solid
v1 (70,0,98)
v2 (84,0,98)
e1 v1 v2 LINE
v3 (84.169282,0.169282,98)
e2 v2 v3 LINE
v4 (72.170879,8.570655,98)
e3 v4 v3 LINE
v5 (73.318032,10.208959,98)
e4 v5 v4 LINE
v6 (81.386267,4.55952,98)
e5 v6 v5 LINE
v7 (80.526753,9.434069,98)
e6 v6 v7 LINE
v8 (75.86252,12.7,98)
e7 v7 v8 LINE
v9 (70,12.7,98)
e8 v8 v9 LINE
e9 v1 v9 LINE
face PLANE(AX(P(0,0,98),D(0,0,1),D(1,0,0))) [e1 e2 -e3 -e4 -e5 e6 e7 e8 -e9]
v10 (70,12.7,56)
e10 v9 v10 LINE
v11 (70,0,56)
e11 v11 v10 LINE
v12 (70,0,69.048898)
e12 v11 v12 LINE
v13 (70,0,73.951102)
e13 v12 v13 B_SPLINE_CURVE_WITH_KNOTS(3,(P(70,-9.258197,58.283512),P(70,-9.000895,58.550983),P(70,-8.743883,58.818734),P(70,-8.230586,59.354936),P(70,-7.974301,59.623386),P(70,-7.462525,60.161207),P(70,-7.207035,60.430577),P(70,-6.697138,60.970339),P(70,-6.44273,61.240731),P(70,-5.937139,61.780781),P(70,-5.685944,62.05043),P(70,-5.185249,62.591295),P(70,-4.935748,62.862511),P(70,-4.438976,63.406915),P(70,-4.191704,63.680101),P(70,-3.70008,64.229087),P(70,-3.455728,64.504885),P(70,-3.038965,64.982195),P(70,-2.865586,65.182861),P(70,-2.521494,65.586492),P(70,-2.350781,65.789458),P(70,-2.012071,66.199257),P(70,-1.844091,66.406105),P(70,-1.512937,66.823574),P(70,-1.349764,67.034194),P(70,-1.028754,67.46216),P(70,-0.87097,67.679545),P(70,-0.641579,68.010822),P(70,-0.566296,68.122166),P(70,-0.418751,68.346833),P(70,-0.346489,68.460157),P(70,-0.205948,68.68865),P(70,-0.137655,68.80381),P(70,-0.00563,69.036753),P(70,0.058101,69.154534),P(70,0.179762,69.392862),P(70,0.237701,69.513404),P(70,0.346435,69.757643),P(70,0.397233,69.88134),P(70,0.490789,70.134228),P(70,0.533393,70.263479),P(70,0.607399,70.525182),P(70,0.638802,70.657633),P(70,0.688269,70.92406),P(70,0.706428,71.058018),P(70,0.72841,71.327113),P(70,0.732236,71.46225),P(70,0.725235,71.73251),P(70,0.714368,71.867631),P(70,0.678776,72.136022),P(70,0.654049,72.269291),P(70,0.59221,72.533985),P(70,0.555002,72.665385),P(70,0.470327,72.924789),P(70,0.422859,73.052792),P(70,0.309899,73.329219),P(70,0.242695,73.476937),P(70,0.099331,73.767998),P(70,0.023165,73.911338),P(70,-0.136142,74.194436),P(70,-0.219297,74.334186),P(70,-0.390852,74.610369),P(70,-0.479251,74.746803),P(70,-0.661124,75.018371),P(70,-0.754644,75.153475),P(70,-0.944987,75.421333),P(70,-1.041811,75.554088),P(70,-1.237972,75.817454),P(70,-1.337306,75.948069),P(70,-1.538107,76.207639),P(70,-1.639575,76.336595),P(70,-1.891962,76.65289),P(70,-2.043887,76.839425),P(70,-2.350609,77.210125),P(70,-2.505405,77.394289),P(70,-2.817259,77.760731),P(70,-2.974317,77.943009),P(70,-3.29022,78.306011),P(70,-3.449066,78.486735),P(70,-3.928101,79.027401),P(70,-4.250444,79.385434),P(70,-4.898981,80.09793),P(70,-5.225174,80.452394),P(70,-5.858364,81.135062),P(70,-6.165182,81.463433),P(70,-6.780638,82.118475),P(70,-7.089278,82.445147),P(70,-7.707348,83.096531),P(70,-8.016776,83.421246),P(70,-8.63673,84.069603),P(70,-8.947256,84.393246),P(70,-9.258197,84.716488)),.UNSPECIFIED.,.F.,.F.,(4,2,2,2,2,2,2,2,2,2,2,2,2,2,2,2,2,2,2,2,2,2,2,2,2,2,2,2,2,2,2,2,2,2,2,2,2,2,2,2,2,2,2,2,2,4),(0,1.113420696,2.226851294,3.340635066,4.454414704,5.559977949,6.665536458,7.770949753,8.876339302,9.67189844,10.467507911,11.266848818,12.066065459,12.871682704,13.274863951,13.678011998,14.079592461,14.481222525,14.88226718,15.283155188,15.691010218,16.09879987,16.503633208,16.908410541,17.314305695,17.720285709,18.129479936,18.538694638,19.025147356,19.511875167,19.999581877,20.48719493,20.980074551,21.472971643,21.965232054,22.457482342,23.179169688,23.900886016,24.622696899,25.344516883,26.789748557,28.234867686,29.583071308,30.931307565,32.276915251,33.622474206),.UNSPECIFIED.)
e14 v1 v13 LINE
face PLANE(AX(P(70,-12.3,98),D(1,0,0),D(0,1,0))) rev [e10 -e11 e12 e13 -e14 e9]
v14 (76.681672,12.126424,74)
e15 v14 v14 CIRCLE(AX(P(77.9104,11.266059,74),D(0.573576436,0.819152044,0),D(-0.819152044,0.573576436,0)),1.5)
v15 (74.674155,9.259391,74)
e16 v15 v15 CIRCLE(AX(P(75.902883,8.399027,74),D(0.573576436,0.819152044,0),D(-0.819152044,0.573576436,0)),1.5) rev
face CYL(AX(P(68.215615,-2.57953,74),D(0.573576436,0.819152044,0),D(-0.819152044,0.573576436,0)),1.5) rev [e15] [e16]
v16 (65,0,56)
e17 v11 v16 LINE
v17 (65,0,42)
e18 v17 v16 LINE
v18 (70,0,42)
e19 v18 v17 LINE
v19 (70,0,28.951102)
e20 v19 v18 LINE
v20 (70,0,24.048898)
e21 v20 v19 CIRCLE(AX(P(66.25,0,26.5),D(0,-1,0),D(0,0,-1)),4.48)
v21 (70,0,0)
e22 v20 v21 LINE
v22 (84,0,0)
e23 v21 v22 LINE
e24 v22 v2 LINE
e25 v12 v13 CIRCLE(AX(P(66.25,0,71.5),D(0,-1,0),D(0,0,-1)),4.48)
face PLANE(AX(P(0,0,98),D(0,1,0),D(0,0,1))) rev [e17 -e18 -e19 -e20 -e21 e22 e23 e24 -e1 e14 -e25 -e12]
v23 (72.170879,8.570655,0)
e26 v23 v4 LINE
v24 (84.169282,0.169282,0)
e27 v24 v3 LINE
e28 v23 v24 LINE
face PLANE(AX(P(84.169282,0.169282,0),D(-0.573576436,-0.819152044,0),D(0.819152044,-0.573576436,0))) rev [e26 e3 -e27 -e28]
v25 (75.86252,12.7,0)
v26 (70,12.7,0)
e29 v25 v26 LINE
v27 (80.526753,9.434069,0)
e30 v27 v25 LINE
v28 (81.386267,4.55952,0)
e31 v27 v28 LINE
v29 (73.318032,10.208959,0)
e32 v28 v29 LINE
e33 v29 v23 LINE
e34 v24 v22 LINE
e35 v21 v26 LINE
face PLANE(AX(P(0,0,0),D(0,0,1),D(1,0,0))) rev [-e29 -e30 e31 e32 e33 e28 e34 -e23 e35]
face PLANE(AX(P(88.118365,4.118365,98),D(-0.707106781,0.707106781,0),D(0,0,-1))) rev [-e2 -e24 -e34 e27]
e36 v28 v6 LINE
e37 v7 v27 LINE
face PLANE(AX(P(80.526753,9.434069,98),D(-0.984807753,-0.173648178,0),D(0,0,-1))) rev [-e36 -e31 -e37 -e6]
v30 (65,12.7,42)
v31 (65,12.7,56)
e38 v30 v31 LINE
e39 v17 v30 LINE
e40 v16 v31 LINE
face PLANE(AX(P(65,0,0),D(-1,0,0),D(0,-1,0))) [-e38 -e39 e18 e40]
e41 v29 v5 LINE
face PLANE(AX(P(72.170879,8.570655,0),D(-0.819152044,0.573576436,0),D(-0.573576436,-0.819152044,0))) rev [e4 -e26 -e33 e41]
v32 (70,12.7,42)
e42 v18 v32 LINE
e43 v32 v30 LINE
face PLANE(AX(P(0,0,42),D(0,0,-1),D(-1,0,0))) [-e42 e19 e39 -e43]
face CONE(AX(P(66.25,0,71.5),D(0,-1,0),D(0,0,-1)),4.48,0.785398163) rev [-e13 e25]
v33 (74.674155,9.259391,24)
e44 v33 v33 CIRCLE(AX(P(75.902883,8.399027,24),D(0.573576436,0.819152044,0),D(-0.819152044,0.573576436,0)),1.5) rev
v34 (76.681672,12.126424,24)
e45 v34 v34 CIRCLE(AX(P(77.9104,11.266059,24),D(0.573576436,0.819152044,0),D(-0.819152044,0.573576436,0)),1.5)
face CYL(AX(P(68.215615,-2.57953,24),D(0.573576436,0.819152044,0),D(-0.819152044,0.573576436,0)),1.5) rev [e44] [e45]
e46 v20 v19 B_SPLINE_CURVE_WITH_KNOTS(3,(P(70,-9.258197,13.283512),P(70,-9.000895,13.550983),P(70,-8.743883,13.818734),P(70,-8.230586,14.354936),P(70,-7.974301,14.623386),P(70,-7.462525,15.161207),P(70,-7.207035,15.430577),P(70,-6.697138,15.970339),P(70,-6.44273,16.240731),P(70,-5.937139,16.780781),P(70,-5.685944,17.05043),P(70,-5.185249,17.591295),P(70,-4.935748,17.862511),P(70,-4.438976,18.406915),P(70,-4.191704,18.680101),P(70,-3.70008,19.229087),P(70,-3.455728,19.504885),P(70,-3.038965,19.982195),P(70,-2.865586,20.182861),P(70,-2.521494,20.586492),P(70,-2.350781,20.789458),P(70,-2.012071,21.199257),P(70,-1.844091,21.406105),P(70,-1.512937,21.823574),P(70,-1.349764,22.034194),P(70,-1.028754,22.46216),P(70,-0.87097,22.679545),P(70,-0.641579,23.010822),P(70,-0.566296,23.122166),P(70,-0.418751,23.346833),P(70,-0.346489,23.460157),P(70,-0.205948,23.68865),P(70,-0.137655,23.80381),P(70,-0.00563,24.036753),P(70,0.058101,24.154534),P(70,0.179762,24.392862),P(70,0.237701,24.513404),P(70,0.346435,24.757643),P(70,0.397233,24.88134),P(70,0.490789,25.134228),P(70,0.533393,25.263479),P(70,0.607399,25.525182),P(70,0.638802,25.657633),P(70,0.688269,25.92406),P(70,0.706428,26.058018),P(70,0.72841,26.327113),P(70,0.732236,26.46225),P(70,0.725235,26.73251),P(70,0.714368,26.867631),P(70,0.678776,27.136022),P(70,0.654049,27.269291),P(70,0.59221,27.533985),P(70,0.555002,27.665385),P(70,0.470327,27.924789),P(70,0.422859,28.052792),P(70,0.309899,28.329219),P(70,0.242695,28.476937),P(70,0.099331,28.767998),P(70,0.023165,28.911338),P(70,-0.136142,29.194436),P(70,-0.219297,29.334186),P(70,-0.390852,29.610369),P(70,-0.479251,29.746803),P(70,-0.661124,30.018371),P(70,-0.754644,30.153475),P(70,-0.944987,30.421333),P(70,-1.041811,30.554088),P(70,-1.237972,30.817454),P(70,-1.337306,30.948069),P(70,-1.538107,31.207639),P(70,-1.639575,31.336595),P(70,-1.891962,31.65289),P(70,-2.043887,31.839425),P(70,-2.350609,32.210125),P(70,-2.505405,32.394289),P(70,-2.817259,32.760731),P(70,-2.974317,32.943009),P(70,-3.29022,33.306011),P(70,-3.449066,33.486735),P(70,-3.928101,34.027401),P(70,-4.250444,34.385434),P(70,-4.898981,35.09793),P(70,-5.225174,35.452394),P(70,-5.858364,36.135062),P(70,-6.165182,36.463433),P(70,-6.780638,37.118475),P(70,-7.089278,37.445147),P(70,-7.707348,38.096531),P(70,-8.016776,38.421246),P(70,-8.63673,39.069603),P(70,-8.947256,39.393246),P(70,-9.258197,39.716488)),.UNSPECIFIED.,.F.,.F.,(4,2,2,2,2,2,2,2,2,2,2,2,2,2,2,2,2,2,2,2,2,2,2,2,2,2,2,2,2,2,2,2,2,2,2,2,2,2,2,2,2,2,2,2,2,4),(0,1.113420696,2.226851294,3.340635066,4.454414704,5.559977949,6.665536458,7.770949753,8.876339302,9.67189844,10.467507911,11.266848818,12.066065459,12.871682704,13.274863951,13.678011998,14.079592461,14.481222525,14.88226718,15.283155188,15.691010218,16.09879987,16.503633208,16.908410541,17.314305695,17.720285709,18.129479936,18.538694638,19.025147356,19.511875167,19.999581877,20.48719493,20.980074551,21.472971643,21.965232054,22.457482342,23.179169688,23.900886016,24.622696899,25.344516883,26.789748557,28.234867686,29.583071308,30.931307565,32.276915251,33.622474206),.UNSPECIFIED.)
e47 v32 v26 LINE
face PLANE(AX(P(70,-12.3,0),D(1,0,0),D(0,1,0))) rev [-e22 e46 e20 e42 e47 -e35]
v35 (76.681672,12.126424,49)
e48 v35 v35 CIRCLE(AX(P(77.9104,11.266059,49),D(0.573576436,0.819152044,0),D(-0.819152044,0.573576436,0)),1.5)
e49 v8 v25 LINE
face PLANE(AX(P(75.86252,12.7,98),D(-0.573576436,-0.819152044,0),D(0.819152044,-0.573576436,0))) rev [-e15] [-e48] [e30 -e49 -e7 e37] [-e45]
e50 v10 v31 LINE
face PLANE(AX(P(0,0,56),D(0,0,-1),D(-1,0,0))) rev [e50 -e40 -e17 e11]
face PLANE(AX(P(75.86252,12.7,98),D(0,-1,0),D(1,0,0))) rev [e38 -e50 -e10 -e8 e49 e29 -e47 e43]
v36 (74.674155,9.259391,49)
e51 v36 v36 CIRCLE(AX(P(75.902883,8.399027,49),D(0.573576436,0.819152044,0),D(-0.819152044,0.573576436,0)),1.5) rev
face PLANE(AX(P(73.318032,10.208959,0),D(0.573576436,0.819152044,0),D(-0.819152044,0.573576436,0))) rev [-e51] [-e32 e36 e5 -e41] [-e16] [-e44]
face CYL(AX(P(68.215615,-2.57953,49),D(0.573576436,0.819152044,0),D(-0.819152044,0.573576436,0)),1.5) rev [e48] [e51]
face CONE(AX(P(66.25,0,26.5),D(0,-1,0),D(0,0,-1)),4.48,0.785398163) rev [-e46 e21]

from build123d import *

# Parameters (mm, degrees)
RESSALTO_EXTRUS_O1_DEPTH                            = 98
ESBO_O4_W                                           = 33
ESBO_O4_H                                           = 22
CORTE_EXTRUS_O3_DEPTH                               = 25
ESBO_O10_W                                          = 12
ESBO_O10_H                                          = 4
CORTE_EXTRUS_O8_DEPTH                               = 122.545423608
ESBO_O11_R                                          = 1.6
CORTE_EXTRUS_O9_DEPTH                               = 20
ESBO_O12_W                                          = 22
ESBO_O12_H                                          = 40
CORTE_EXTRUS_O10_DEPTH                              = 10
FILETE1_R                                           = 2.5
ESCAREADO_PARA_PARAFUSO_ALLEN_SEXTAVADO_D           = 4.3
ESCAREADO_PARA_PARAFUSO_ALLEN_SEXTAVADO_CSINK_D     = 8.96
ESCAREADO_PARA_PARAFUSO_ALLEN_SEXTAVADO_CSINK_ANGLE = 90
ESBO_O15_W                                          = 4
ESBO_O15_H                                          = 22
CORTE_EXTRUS_O11_DEPTH                              = 137.386546257
ESBO_O16_W                                          = 59.5
ESBO_O16_H                                          = 54
ESBO_O16_R                                          = 2.15
CORTE_EXTRUS_O12_DEPTH                              = 137.386546257
CHANFRO1_SIZE                                       = 10
CHANFRO1_SIZE2                                      = 7.180150431
CORTE_EXTRUS_O14_DEPTH                              = 102.622518505
CORTE_EXTRUS_O14_DEPTH_BACK                         = 102.622518505
CHANFRO2_SIZE                                       = 8
CHANFRO2_SIZE_2                                     = 9.267647445
CORTE_EXTRUS_O15_REACH                              = 121.956
ESBO_O19_R                                          = 1.5


with BuildPart() as part:
    # Esboço1 → Ressalto-extrusão1 (new body)
    with BuildSketch(Plane.XY):
        Polygon((0, 0), (94, 0), (75.862520314, 12.7), (0, 12.7), align=None)
    extrude(amount=RESSALTO_EXTRUS_O1_DEPTH)

    # Esboço4 → Corte-extrusão3 (cut)
    with BuildSketch(Plane(origin=(0, 12.7, 0), x_dir=(1, 0, 0), z_dir=(0, 1, 0))):
        with Locations((16.5, -87)):
            Rectangle(ESBO_O4_W, ESBO_O4_H)
        with Locations((16.5, -11)):
            Rectangle(ESBO_O4_W, ESBO_O4_H)
        with Locations((53.5, -87)):
            Rectangle(ESBO_O4_W, ESBO_O4_H)
        with Locations((53.5, -11)):
            Rectangle(ESBO_O4_W, ESBO_O4_H)
    extrude(amount=-CORTE_EXTRUS_O3_DEPTH, mode=Mode.SUBTRACT)

    # Esboço10 → Corte-extrusão8 (cut, through all)
    with BuildSketch(Plane.XY.offset(76)):
        with Locations((16.5, 10.7)):
            Rectangle(ESBO_O10_W, ESBO_O10_H)
        with Locations((53.5, 10.7)):
            Rectangle(ESBO_O10_W, ESBO_O10_H)
    extrude(amount=-CORTE_EXTRUS_O8_DEPTH, mode=Mode.SUBTRACT)

    # Esboço11 → Corte-extrusão9 (cut)
    with BuildSketch(Plane(origin=(0, 12.7, 0), x_dir=(1, 0, 0), z_dir=(0, 1, 0))):
        with Locations(Location((29.25, -26.5, 0), (0, 0, 180))):
            Circle(ESBO_O11_R)
        with Locations(Location((29.25, -71.5, 0), (0, 0, 180))):
            Circle(ESBO_O11_R)
        with Locations(Location((3.75, -71.5, 0), (0, 0, 180))):
            Circle(ESBO_O11_R)
        with Locations(Location((3.75, -26.5, 0), (0, 0, 180))):
            Circle(ESBO_O11_R)
        with Locations(Location((40.75, -26.5, 0), (0, 0, 180))):
            Circle(ESBO_O11_R)
        with Locations(Location((66.25, -26.5, 0), (0, 0, 180))):
            Circle(ESBO_O11_R)
        with Locations(Location((66.25, -71.5, 0), (0, 0, 180))):
            Circle(ESBO_O11_R)
        with Locations(Location((40.75, -71.5, 0), (0, 0, 180))):
            Circle(ESBO_O11_R)
    extrude(amount=-CORTE_EXTRUS_O9_DEPTH, mode=Mode.SUBTRACT)

    # Esboço12 → Corte-extrusão10 (cut)
    with BuildSketch(Plane(origin=(0, 12.7, 0), x_dir=(1, 0, 0), z_dir=(0, 1, 0))):
        with Locations((35, -49)):
            Rectangle(ESBO_O12_W, ESBO_O12_H)
    extrude(amount=-CORTE_EXTRUS_O10_DEPTH, mode=Mode.SUBTRACT)

    # Filete1
    filete1_edges = [part.edges().sort_by_distance(p)[0] for p in [
        (46, 7.7, 29),
        (46, 7.7, 69),
        (24, 7.7, 69),
        (24, 7.7, 29),
    ]]
    fillet(filete1_edges, radius=FILETE1_R)

    # Escareado para parafuso Allen sextavado escareado de M41 (through all)
    with Locations(Plane(origin=(0, 0, 0), x_dir=(-1, 0, 0), z_dir=(0, -1, 0))):
        with Locations((-66.25, -71.5), (-66.25, -26.5), (-40.75, -26.5), (-29.25, -26.5), (-29.25, -71.5), (-40.75, -71.5), (-3.75, -71.5), (-3.75, -26.5)):
            CounterSinkHole(ESCAREADO_PARA_PARAFUSO_ALLEN_SEXTAVADO_D / 2, ESCAREADO_PARA_PARAFUSO_ALLEN_SEXTAVADO_CSINK_D / 2, counter_sink_angle=ESCAREADO_PARA_PARAFUSO_ALLEN_SEXTAVADO_CSINK_ANGLE)

    # Esboço15 → Corte-extrusão11 (cut, through all)
    with BuildSketch(Plane(origin=(0, 12.7, 0), x_dir=(1, 0, 0), z_dir=(0, 1, 0))):
        with Locations((35, -11)):
            Rectangle(ESBO_O15_W, ESBO_O15_H)
        with Locations((35, -87)):
            Rectangle(ESBO_O15_W, ESBO_O15_H)
    extrude(amount=-CORTE_EXTRUS_O11_DEPTH, mode=Mode.SUBTRACT)

    # Esboço16 → Corte-extrusão12 (cut, through all)
    # profile 1 of 2: a face of its own
    with BuildSketch(Plane(origin=(0, 12.7, 0), x_dir=(1, 0, 0), z_dir=(0, 1, 0))):
        with Locations((29.75, -49)):
            Rectangle(ESBO_O16_W, ESBO_O16_H)
    # profile 2 of 2: a face of its own
    with BuildSketch(Plane(origin=(0, 12.7, 0), x_dir=(1, 0, 0), z_dir=(0, 1, 0))):
        Polygon((70, -42), (70, -22), (59.5, -22), (59.5, -76), (70, -76), (70, -56), (65, -56), (65, -42), align=None)
        with Locations((66.25, -71.5)):
            Circle(ESBO_O16_R, mode=Mode.SUBTRACT)
        with Locations((66.25, -26.5)):
            Circle(ESBO_O16_R, mode=Mode.SUBTRACT)
    extrude(amount=-CORTE_EXTRUS_O12_DEPTH, mode=Mode.SUBTRACT)

    # Chanfro1
    chanfro1_edges = [part.edges().sort_by_distance(p)[0] for p in [
        (94, 0, 49),
    ]]
    chanfro1_side = [part.faces().sort_by_distance(p)[0] for p in [
        (81.603595513, 0, 49),
    ]]
    chamfer(chanfro1_edges, length=CHANFRO1_SIZE, length2=CHANFRO1_SIZE2, reference=chanfro1_side[0])

    # Esboço18 → Corte-extrusão14 (cut, two sides: drawn at the far end of the back side and taken through both)
    with BuildSketch(Plane.XY.offset(49).offset(-CORTE_EXTRUS_O14_DEPTH_BACK)):
        Polygon((73.318031781, 10.208958991), (85.605312446, 1.605312446), (84.16928236, 0.16928236), (72.170878909, 8.570654902), align=None)
    extrude(amount=CORTE_EXTRUS_O14_DEPTH + CORTE_EXTRUS_O14_DEPTH_BACK, mode=Mode.SUBTRACT)

    # Chanfro2
    # the kernel refuses this chamfer: 9.267647445, 8 mm, written as the material it takes off along each edge
    with BuildSketch(Plane(origin=(88.118365096, 4.118365096, -23.833451274), x_dir=(-0.6804962674600086, -0.7327515472334374, 0), z_dir=(0, 0, 1))) as chanfro2_piece_1_section:
        Polygon((CHANFRO2_SIZE * 0.999317113267, -CHANFRO2_SIZE * 0.0369500626806), (CHANFRO2_SIZE_2 * 0.137140887434, -CHANFRO2_SIZE_2 * 0.990551551958), (0, 0), align=None)
    chanfro2_piece_1 = extrude(amount=145.666902548, mode=Mode.PRIVATE)
    chanfro2_piece_1 = split(chanfro2_piece_1, bisect_by=Plane(origin=(81.702068422, 1.896844157, 49), z_dir=(0.5735764363510464, 0.8191520442889916, 0)), keep=Keep.TOP, mode=Mode.PRIVATE)
    add(chanfro2_piece_1, mode=Mode.SUBTRACT)

    # Esboço19 → Corte-extrusão15 (cut, up to next)
    with BuildSketch(Plane(origin=(30.925053264, 44.165553177, 0), x_dir=(0.819152044288991, -0.5735764363510472, 0), z_dir=(0.5735764363510472, 0.819152044288991, 0)), mode=Mode.PRIVATE) as corte_extrus_o15_sk1:
        with Locations(Location((57.358517859, -74, 0), (0, 0, 180))):
            Circle(ESBO_O19_R)
    corte_extrus_o15_tool1 = extrude(corte_extrus_o15_sk1.sketch, amount=-CORTE_EXTRUS_O15_REACH, mode=Mode.PRIVATE) & part.part
    # Esboço19 → Corte-extrusão15 (cut, up to next)
    with BuildSketch(Plane(origin=(30.925053264, 44.165553177, 0), x_dir=(0.819152044288991, -0.5735764363510472, 0), z_dir=(0.5735764363510472, 0.819152044288991, 0)), mode=Mode.PRIVATE) as corte_extrus_o15_sk2:
        with Locations(Location((57.358517859, -49, 0), (0, 0, 180))):
            Circle(ESBO_O19_R)
    corte_extrus_o15_tool2 = extrude(corte_extrus_o15_sk2.sketch, amount=-CORTE_EXTRUS_O15_REACH, mode=Mode.PRIVATE) & part.part
    # Esboço19 → Corte-extrusão15 (cut, up to next)
    with BuildSketch(Plane(origin=(30.925053264, 44.165553177, 0), x_dir=(0.819152044288991, -0.5735764363510472, 0), z_dir=(0.5735764363510472, 0.819152044288991, 0)), mode=Mode.PRIVATE) as corte_extrus_o15_sk3:
        with Locations(Location((57.358517859, -24, 0), (0, 0, 180))):
            Circle(ESBO_O19_R)
    corte_extrus_o15_tool3 = extrude(corte_extrus_o15_sk3.sketch, amount=-CORTE_EXTRUS_O15_REACH, mode=Mode.PRIVATE) & part.part
    add(corte_extrus_o15_tool1.solids().sort_by_distance((77.9104, 11.266059, 74))[0], mode=Mode.SUBTRACT)
    add(corte_extrus_o15_tool2.solids().sort_by_distance((77.9104, 11.266059, 49))[0], mode=Mode.SUBTRACT)
    add(corte_extrus_o15_tool3.solids().sort_by_distance((77.9104, 11.266059, 24))[0], mode=Mode.SUBTRACT)


solid = part.part
